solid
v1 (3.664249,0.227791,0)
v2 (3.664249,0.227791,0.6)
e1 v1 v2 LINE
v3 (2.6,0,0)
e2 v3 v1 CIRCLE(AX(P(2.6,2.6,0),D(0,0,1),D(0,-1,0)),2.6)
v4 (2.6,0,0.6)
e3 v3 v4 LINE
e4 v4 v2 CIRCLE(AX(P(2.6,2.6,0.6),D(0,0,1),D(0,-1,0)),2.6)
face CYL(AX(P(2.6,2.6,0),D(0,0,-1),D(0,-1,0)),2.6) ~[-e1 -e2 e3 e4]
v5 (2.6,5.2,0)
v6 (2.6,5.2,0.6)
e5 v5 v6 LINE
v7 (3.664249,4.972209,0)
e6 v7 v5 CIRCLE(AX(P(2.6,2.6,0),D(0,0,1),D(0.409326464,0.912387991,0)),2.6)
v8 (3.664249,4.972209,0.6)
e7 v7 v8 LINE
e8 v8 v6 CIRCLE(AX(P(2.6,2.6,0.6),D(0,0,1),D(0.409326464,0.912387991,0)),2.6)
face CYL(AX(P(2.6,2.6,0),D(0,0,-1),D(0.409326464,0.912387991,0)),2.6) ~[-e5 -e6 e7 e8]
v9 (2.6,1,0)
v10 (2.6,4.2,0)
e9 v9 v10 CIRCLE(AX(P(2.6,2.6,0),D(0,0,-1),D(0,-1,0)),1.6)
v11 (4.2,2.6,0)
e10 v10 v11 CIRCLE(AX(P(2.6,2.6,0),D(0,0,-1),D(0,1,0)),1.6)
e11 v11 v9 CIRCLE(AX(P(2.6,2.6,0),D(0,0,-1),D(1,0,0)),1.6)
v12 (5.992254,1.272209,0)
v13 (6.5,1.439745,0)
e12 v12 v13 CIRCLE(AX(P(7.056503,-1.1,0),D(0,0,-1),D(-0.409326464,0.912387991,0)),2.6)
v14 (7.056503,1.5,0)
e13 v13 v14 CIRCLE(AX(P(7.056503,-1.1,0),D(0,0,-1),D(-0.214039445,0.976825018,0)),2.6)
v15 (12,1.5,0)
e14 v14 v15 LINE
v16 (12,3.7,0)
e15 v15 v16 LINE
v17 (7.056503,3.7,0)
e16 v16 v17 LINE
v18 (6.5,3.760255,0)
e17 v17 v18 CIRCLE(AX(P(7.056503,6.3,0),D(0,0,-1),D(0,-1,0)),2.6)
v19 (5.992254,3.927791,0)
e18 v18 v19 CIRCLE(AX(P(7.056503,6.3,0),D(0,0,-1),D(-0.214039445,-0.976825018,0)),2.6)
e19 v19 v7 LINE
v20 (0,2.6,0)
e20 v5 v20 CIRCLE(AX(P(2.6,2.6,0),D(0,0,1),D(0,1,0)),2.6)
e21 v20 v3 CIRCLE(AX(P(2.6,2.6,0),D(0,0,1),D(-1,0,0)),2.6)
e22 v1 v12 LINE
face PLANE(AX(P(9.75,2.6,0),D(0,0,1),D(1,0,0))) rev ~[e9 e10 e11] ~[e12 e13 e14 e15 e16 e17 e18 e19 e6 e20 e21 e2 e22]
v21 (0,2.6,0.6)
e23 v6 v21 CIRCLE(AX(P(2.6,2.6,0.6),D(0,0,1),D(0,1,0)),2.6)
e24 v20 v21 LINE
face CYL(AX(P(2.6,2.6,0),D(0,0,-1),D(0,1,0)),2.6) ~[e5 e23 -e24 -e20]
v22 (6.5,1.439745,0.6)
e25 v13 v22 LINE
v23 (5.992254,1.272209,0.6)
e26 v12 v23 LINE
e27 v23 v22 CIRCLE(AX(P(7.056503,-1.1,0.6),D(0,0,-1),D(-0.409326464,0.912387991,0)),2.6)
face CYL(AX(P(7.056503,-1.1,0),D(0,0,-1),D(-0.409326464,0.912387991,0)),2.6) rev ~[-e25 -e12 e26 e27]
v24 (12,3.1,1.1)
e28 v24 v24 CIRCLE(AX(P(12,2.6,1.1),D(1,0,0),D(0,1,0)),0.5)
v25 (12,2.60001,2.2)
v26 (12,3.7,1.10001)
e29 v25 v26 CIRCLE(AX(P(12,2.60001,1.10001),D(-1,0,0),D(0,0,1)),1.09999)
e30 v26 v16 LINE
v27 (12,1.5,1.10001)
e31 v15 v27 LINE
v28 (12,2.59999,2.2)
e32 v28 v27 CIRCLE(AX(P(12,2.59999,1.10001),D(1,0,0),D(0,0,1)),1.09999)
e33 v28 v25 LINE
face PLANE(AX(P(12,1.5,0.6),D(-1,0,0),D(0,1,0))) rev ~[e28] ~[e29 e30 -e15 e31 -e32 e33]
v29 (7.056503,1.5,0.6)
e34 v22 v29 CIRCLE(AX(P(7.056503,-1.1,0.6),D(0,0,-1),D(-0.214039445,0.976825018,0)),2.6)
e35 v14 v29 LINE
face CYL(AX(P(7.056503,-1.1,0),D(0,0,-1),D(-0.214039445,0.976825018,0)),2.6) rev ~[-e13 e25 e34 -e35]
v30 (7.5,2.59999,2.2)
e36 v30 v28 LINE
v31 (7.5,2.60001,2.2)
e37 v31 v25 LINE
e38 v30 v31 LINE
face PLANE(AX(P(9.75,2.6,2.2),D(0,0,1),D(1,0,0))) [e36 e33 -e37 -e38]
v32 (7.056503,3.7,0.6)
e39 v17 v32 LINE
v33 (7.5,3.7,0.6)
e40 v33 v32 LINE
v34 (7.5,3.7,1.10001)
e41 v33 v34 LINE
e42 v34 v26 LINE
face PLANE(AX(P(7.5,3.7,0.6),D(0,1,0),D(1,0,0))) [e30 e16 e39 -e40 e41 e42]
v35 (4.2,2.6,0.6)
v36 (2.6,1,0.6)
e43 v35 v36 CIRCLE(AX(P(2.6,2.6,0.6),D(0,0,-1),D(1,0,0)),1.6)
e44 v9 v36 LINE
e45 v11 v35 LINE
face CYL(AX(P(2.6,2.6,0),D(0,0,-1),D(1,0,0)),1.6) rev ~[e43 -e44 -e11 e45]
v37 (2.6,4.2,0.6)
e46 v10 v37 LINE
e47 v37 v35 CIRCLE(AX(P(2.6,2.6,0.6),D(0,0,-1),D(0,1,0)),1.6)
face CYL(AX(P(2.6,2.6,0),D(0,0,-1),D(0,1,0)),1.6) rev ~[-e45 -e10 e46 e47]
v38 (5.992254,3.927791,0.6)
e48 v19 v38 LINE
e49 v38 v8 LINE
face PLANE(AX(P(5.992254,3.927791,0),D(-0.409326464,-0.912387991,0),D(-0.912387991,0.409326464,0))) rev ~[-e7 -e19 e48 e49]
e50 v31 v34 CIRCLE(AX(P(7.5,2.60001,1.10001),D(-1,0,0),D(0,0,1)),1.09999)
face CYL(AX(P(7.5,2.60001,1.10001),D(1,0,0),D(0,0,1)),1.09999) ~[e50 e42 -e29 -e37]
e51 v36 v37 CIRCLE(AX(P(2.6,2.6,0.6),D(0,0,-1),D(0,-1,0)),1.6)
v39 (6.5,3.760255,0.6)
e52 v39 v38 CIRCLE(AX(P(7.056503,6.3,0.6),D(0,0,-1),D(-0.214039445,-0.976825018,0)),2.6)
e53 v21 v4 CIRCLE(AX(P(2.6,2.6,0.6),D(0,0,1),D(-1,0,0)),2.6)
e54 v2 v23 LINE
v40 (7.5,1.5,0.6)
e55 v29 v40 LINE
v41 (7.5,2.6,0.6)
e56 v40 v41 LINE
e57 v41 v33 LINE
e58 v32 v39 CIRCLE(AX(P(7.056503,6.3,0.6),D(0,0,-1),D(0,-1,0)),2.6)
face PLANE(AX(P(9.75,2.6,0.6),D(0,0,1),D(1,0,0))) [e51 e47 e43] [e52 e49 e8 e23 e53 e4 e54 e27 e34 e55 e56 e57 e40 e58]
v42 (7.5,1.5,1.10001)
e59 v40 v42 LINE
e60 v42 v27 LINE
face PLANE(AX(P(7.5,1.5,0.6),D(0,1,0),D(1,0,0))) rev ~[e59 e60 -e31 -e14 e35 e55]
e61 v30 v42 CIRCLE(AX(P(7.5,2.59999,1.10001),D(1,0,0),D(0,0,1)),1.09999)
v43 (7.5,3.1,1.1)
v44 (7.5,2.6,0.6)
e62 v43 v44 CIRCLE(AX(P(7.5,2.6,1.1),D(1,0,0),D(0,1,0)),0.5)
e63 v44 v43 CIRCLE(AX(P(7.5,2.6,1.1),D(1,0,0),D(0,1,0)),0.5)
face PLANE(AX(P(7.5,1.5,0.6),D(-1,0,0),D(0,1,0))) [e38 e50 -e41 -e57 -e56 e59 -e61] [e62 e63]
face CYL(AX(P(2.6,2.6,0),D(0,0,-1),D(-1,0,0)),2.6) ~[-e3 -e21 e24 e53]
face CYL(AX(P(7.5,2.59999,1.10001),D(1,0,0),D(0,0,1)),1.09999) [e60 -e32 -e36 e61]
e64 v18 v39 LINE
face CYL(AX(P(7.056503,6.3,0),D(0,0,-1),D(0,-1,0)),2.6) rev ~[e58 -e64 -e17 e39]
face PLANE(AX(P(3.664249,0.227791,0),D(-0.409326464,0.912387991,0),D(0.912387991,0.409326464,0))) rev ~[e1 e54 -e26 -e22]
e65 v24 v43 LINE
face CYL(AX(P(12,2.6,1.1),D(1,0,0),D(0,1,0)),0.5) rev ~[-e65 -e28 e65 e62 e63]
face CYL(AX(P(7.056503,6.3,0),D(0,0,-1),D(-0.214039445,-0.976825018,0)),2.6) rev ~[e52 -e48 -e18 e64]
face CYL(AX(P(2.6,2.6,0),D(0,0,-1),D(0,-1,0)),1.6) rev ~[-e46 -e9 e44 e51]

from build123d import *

# Parameters (mm, degrees)
F0_W     = 4.5
F0_H     = 2.2
F1_DEPTH = 0.6
F2_W     = 4.5
F2_H     = 2.2
F3_DEPTH = 1.6
F4_R     = 1.09999
F5_R     = 0.5
F6_DEPTH = 25


# Not quite as in the source:
# - a fillet or chamfer is up to 0.001 mm smaller than in the source, because OpenCascade refuses the exact size


with BuildPart() as f1:
    # F0 (on Top) → F1 (new body)
    with BuildSketch(Plane.XY):
        with Locations((9.75, 2.6)):
            Rectangle(F0_W, F0_H)
        with BuildLine():
            Line((7.0565025569, 1.5), (7.5, 1.5))
            Line((7.5, 1.5), (7.5, 3.7))
            Line((7.5, 3.7), (7.0565025569, 3.7))
            ThreePointArc((7.0565025569, 3.7), (6.7766250144, 3.7151076306), (6.5, 3.7602549529))
            ThreePointArc((6.5, 3.7602549529), (6.2418088438, 3.8309365837), (5.9922537502, 3.9277912239))
            Line((5.9922537502, 3.9277912239), (3.6642488067, 4.9722087761))
            ThreePointArc((3.6642488067, 4.9722087761), (4.7825497586, 4.012967286), (5.2, 2.6))
            ThreePointArc((5.2, 2.6), (4.7825497586, 1.187032714), (3.6642488067, 0.2277912239))
            Line((3.6642488067, 0.2277912239), (5.9922537502, 1.2722087761))
            ThreePointArc((5.9922537502, 1.2722087761), (6.2418088438, 1.3690634163), (6.5, 1.4397450471))
            ThreePointArc((6.5, 1.4397450471), (6.7766250144, 1.4848923694), (7.0565025569, 1.5))
        make_face()
        with BuildLine():
            ThreePointArc((2.6, 0), (3.1441769851, 0.0575855159), (3.6642488067, 0.2277912239))
            ThreePointArc((3.6642488067, 0.2277912239), (4.7825497586, 1.187032714), (5.2, 2.6))
            ThreePointArc((5.2, 2.6), (4.7825497586, 4.012967286), (3.6642488067, 4.9722087761))
            ThreePointArc((3.6642488067, 4.9722087761), (3.1441769851, 5.1424144841), (2.6, 5.2))
            Line((2.6, 5.2), (2.6, 4.2))
            ThreePointArc((2.6, 4.2), (3.7313708499, 3.7313708499), (4.2, 2.6))
            ThreePointArc((4.2, 2.6), (3.7313708499, 1.4686291501), (2.6, 1))
            Line((2.6, 1), (2.6, 0))
        make_face()
        with BuildLine():
            ThreePointArc((0, 2.6), (0.7615223689, 0.7615223689), (2.6, 0))
            Line((2.6, 0), (2.6, 1))
            ThreePointArc((2.6, 1), (1, 2.6), (2.6, 4.2))
            Line((2.6, 4.2), (2.6, 5.2))
            ThreePointArc((2.6, 5.2), (0.7615223689, 4.4384776311), (0, 2.6))
        make_face()
    extrude(amount=F1_DEPTH)

    # F2 (on face) → F3 (join)
    with BuildSketch(Plane.XY.offset(0.6)):
        with Locations((9.75, 2.6)):
            Rectangle(F2_W, F2_H)
    extrude(amount=F3_DEPTH)

    # F4 (radius 1.1 in the source; OpenCascade refuses exactly that, so slightly less here)
    f4_edges = [f1.edges().sort_by_distance(p)[0] for p in [
        (9.75, 3.7, 2.2),
        (9.75, 1.5, 2.2),
    ]]
    fillet(f4_edges, radius=F4_R)

    # F5 (on face) → F6 (cut)
    with BuildSketch(Plane.YZ.offset(12)):
        with Locations((2.6, 1.1)):
            Circle(F5_R)
    extrude(amount=-F6_DEPTH, mode=Mode.SUBTRACT)


solid = f1.part
